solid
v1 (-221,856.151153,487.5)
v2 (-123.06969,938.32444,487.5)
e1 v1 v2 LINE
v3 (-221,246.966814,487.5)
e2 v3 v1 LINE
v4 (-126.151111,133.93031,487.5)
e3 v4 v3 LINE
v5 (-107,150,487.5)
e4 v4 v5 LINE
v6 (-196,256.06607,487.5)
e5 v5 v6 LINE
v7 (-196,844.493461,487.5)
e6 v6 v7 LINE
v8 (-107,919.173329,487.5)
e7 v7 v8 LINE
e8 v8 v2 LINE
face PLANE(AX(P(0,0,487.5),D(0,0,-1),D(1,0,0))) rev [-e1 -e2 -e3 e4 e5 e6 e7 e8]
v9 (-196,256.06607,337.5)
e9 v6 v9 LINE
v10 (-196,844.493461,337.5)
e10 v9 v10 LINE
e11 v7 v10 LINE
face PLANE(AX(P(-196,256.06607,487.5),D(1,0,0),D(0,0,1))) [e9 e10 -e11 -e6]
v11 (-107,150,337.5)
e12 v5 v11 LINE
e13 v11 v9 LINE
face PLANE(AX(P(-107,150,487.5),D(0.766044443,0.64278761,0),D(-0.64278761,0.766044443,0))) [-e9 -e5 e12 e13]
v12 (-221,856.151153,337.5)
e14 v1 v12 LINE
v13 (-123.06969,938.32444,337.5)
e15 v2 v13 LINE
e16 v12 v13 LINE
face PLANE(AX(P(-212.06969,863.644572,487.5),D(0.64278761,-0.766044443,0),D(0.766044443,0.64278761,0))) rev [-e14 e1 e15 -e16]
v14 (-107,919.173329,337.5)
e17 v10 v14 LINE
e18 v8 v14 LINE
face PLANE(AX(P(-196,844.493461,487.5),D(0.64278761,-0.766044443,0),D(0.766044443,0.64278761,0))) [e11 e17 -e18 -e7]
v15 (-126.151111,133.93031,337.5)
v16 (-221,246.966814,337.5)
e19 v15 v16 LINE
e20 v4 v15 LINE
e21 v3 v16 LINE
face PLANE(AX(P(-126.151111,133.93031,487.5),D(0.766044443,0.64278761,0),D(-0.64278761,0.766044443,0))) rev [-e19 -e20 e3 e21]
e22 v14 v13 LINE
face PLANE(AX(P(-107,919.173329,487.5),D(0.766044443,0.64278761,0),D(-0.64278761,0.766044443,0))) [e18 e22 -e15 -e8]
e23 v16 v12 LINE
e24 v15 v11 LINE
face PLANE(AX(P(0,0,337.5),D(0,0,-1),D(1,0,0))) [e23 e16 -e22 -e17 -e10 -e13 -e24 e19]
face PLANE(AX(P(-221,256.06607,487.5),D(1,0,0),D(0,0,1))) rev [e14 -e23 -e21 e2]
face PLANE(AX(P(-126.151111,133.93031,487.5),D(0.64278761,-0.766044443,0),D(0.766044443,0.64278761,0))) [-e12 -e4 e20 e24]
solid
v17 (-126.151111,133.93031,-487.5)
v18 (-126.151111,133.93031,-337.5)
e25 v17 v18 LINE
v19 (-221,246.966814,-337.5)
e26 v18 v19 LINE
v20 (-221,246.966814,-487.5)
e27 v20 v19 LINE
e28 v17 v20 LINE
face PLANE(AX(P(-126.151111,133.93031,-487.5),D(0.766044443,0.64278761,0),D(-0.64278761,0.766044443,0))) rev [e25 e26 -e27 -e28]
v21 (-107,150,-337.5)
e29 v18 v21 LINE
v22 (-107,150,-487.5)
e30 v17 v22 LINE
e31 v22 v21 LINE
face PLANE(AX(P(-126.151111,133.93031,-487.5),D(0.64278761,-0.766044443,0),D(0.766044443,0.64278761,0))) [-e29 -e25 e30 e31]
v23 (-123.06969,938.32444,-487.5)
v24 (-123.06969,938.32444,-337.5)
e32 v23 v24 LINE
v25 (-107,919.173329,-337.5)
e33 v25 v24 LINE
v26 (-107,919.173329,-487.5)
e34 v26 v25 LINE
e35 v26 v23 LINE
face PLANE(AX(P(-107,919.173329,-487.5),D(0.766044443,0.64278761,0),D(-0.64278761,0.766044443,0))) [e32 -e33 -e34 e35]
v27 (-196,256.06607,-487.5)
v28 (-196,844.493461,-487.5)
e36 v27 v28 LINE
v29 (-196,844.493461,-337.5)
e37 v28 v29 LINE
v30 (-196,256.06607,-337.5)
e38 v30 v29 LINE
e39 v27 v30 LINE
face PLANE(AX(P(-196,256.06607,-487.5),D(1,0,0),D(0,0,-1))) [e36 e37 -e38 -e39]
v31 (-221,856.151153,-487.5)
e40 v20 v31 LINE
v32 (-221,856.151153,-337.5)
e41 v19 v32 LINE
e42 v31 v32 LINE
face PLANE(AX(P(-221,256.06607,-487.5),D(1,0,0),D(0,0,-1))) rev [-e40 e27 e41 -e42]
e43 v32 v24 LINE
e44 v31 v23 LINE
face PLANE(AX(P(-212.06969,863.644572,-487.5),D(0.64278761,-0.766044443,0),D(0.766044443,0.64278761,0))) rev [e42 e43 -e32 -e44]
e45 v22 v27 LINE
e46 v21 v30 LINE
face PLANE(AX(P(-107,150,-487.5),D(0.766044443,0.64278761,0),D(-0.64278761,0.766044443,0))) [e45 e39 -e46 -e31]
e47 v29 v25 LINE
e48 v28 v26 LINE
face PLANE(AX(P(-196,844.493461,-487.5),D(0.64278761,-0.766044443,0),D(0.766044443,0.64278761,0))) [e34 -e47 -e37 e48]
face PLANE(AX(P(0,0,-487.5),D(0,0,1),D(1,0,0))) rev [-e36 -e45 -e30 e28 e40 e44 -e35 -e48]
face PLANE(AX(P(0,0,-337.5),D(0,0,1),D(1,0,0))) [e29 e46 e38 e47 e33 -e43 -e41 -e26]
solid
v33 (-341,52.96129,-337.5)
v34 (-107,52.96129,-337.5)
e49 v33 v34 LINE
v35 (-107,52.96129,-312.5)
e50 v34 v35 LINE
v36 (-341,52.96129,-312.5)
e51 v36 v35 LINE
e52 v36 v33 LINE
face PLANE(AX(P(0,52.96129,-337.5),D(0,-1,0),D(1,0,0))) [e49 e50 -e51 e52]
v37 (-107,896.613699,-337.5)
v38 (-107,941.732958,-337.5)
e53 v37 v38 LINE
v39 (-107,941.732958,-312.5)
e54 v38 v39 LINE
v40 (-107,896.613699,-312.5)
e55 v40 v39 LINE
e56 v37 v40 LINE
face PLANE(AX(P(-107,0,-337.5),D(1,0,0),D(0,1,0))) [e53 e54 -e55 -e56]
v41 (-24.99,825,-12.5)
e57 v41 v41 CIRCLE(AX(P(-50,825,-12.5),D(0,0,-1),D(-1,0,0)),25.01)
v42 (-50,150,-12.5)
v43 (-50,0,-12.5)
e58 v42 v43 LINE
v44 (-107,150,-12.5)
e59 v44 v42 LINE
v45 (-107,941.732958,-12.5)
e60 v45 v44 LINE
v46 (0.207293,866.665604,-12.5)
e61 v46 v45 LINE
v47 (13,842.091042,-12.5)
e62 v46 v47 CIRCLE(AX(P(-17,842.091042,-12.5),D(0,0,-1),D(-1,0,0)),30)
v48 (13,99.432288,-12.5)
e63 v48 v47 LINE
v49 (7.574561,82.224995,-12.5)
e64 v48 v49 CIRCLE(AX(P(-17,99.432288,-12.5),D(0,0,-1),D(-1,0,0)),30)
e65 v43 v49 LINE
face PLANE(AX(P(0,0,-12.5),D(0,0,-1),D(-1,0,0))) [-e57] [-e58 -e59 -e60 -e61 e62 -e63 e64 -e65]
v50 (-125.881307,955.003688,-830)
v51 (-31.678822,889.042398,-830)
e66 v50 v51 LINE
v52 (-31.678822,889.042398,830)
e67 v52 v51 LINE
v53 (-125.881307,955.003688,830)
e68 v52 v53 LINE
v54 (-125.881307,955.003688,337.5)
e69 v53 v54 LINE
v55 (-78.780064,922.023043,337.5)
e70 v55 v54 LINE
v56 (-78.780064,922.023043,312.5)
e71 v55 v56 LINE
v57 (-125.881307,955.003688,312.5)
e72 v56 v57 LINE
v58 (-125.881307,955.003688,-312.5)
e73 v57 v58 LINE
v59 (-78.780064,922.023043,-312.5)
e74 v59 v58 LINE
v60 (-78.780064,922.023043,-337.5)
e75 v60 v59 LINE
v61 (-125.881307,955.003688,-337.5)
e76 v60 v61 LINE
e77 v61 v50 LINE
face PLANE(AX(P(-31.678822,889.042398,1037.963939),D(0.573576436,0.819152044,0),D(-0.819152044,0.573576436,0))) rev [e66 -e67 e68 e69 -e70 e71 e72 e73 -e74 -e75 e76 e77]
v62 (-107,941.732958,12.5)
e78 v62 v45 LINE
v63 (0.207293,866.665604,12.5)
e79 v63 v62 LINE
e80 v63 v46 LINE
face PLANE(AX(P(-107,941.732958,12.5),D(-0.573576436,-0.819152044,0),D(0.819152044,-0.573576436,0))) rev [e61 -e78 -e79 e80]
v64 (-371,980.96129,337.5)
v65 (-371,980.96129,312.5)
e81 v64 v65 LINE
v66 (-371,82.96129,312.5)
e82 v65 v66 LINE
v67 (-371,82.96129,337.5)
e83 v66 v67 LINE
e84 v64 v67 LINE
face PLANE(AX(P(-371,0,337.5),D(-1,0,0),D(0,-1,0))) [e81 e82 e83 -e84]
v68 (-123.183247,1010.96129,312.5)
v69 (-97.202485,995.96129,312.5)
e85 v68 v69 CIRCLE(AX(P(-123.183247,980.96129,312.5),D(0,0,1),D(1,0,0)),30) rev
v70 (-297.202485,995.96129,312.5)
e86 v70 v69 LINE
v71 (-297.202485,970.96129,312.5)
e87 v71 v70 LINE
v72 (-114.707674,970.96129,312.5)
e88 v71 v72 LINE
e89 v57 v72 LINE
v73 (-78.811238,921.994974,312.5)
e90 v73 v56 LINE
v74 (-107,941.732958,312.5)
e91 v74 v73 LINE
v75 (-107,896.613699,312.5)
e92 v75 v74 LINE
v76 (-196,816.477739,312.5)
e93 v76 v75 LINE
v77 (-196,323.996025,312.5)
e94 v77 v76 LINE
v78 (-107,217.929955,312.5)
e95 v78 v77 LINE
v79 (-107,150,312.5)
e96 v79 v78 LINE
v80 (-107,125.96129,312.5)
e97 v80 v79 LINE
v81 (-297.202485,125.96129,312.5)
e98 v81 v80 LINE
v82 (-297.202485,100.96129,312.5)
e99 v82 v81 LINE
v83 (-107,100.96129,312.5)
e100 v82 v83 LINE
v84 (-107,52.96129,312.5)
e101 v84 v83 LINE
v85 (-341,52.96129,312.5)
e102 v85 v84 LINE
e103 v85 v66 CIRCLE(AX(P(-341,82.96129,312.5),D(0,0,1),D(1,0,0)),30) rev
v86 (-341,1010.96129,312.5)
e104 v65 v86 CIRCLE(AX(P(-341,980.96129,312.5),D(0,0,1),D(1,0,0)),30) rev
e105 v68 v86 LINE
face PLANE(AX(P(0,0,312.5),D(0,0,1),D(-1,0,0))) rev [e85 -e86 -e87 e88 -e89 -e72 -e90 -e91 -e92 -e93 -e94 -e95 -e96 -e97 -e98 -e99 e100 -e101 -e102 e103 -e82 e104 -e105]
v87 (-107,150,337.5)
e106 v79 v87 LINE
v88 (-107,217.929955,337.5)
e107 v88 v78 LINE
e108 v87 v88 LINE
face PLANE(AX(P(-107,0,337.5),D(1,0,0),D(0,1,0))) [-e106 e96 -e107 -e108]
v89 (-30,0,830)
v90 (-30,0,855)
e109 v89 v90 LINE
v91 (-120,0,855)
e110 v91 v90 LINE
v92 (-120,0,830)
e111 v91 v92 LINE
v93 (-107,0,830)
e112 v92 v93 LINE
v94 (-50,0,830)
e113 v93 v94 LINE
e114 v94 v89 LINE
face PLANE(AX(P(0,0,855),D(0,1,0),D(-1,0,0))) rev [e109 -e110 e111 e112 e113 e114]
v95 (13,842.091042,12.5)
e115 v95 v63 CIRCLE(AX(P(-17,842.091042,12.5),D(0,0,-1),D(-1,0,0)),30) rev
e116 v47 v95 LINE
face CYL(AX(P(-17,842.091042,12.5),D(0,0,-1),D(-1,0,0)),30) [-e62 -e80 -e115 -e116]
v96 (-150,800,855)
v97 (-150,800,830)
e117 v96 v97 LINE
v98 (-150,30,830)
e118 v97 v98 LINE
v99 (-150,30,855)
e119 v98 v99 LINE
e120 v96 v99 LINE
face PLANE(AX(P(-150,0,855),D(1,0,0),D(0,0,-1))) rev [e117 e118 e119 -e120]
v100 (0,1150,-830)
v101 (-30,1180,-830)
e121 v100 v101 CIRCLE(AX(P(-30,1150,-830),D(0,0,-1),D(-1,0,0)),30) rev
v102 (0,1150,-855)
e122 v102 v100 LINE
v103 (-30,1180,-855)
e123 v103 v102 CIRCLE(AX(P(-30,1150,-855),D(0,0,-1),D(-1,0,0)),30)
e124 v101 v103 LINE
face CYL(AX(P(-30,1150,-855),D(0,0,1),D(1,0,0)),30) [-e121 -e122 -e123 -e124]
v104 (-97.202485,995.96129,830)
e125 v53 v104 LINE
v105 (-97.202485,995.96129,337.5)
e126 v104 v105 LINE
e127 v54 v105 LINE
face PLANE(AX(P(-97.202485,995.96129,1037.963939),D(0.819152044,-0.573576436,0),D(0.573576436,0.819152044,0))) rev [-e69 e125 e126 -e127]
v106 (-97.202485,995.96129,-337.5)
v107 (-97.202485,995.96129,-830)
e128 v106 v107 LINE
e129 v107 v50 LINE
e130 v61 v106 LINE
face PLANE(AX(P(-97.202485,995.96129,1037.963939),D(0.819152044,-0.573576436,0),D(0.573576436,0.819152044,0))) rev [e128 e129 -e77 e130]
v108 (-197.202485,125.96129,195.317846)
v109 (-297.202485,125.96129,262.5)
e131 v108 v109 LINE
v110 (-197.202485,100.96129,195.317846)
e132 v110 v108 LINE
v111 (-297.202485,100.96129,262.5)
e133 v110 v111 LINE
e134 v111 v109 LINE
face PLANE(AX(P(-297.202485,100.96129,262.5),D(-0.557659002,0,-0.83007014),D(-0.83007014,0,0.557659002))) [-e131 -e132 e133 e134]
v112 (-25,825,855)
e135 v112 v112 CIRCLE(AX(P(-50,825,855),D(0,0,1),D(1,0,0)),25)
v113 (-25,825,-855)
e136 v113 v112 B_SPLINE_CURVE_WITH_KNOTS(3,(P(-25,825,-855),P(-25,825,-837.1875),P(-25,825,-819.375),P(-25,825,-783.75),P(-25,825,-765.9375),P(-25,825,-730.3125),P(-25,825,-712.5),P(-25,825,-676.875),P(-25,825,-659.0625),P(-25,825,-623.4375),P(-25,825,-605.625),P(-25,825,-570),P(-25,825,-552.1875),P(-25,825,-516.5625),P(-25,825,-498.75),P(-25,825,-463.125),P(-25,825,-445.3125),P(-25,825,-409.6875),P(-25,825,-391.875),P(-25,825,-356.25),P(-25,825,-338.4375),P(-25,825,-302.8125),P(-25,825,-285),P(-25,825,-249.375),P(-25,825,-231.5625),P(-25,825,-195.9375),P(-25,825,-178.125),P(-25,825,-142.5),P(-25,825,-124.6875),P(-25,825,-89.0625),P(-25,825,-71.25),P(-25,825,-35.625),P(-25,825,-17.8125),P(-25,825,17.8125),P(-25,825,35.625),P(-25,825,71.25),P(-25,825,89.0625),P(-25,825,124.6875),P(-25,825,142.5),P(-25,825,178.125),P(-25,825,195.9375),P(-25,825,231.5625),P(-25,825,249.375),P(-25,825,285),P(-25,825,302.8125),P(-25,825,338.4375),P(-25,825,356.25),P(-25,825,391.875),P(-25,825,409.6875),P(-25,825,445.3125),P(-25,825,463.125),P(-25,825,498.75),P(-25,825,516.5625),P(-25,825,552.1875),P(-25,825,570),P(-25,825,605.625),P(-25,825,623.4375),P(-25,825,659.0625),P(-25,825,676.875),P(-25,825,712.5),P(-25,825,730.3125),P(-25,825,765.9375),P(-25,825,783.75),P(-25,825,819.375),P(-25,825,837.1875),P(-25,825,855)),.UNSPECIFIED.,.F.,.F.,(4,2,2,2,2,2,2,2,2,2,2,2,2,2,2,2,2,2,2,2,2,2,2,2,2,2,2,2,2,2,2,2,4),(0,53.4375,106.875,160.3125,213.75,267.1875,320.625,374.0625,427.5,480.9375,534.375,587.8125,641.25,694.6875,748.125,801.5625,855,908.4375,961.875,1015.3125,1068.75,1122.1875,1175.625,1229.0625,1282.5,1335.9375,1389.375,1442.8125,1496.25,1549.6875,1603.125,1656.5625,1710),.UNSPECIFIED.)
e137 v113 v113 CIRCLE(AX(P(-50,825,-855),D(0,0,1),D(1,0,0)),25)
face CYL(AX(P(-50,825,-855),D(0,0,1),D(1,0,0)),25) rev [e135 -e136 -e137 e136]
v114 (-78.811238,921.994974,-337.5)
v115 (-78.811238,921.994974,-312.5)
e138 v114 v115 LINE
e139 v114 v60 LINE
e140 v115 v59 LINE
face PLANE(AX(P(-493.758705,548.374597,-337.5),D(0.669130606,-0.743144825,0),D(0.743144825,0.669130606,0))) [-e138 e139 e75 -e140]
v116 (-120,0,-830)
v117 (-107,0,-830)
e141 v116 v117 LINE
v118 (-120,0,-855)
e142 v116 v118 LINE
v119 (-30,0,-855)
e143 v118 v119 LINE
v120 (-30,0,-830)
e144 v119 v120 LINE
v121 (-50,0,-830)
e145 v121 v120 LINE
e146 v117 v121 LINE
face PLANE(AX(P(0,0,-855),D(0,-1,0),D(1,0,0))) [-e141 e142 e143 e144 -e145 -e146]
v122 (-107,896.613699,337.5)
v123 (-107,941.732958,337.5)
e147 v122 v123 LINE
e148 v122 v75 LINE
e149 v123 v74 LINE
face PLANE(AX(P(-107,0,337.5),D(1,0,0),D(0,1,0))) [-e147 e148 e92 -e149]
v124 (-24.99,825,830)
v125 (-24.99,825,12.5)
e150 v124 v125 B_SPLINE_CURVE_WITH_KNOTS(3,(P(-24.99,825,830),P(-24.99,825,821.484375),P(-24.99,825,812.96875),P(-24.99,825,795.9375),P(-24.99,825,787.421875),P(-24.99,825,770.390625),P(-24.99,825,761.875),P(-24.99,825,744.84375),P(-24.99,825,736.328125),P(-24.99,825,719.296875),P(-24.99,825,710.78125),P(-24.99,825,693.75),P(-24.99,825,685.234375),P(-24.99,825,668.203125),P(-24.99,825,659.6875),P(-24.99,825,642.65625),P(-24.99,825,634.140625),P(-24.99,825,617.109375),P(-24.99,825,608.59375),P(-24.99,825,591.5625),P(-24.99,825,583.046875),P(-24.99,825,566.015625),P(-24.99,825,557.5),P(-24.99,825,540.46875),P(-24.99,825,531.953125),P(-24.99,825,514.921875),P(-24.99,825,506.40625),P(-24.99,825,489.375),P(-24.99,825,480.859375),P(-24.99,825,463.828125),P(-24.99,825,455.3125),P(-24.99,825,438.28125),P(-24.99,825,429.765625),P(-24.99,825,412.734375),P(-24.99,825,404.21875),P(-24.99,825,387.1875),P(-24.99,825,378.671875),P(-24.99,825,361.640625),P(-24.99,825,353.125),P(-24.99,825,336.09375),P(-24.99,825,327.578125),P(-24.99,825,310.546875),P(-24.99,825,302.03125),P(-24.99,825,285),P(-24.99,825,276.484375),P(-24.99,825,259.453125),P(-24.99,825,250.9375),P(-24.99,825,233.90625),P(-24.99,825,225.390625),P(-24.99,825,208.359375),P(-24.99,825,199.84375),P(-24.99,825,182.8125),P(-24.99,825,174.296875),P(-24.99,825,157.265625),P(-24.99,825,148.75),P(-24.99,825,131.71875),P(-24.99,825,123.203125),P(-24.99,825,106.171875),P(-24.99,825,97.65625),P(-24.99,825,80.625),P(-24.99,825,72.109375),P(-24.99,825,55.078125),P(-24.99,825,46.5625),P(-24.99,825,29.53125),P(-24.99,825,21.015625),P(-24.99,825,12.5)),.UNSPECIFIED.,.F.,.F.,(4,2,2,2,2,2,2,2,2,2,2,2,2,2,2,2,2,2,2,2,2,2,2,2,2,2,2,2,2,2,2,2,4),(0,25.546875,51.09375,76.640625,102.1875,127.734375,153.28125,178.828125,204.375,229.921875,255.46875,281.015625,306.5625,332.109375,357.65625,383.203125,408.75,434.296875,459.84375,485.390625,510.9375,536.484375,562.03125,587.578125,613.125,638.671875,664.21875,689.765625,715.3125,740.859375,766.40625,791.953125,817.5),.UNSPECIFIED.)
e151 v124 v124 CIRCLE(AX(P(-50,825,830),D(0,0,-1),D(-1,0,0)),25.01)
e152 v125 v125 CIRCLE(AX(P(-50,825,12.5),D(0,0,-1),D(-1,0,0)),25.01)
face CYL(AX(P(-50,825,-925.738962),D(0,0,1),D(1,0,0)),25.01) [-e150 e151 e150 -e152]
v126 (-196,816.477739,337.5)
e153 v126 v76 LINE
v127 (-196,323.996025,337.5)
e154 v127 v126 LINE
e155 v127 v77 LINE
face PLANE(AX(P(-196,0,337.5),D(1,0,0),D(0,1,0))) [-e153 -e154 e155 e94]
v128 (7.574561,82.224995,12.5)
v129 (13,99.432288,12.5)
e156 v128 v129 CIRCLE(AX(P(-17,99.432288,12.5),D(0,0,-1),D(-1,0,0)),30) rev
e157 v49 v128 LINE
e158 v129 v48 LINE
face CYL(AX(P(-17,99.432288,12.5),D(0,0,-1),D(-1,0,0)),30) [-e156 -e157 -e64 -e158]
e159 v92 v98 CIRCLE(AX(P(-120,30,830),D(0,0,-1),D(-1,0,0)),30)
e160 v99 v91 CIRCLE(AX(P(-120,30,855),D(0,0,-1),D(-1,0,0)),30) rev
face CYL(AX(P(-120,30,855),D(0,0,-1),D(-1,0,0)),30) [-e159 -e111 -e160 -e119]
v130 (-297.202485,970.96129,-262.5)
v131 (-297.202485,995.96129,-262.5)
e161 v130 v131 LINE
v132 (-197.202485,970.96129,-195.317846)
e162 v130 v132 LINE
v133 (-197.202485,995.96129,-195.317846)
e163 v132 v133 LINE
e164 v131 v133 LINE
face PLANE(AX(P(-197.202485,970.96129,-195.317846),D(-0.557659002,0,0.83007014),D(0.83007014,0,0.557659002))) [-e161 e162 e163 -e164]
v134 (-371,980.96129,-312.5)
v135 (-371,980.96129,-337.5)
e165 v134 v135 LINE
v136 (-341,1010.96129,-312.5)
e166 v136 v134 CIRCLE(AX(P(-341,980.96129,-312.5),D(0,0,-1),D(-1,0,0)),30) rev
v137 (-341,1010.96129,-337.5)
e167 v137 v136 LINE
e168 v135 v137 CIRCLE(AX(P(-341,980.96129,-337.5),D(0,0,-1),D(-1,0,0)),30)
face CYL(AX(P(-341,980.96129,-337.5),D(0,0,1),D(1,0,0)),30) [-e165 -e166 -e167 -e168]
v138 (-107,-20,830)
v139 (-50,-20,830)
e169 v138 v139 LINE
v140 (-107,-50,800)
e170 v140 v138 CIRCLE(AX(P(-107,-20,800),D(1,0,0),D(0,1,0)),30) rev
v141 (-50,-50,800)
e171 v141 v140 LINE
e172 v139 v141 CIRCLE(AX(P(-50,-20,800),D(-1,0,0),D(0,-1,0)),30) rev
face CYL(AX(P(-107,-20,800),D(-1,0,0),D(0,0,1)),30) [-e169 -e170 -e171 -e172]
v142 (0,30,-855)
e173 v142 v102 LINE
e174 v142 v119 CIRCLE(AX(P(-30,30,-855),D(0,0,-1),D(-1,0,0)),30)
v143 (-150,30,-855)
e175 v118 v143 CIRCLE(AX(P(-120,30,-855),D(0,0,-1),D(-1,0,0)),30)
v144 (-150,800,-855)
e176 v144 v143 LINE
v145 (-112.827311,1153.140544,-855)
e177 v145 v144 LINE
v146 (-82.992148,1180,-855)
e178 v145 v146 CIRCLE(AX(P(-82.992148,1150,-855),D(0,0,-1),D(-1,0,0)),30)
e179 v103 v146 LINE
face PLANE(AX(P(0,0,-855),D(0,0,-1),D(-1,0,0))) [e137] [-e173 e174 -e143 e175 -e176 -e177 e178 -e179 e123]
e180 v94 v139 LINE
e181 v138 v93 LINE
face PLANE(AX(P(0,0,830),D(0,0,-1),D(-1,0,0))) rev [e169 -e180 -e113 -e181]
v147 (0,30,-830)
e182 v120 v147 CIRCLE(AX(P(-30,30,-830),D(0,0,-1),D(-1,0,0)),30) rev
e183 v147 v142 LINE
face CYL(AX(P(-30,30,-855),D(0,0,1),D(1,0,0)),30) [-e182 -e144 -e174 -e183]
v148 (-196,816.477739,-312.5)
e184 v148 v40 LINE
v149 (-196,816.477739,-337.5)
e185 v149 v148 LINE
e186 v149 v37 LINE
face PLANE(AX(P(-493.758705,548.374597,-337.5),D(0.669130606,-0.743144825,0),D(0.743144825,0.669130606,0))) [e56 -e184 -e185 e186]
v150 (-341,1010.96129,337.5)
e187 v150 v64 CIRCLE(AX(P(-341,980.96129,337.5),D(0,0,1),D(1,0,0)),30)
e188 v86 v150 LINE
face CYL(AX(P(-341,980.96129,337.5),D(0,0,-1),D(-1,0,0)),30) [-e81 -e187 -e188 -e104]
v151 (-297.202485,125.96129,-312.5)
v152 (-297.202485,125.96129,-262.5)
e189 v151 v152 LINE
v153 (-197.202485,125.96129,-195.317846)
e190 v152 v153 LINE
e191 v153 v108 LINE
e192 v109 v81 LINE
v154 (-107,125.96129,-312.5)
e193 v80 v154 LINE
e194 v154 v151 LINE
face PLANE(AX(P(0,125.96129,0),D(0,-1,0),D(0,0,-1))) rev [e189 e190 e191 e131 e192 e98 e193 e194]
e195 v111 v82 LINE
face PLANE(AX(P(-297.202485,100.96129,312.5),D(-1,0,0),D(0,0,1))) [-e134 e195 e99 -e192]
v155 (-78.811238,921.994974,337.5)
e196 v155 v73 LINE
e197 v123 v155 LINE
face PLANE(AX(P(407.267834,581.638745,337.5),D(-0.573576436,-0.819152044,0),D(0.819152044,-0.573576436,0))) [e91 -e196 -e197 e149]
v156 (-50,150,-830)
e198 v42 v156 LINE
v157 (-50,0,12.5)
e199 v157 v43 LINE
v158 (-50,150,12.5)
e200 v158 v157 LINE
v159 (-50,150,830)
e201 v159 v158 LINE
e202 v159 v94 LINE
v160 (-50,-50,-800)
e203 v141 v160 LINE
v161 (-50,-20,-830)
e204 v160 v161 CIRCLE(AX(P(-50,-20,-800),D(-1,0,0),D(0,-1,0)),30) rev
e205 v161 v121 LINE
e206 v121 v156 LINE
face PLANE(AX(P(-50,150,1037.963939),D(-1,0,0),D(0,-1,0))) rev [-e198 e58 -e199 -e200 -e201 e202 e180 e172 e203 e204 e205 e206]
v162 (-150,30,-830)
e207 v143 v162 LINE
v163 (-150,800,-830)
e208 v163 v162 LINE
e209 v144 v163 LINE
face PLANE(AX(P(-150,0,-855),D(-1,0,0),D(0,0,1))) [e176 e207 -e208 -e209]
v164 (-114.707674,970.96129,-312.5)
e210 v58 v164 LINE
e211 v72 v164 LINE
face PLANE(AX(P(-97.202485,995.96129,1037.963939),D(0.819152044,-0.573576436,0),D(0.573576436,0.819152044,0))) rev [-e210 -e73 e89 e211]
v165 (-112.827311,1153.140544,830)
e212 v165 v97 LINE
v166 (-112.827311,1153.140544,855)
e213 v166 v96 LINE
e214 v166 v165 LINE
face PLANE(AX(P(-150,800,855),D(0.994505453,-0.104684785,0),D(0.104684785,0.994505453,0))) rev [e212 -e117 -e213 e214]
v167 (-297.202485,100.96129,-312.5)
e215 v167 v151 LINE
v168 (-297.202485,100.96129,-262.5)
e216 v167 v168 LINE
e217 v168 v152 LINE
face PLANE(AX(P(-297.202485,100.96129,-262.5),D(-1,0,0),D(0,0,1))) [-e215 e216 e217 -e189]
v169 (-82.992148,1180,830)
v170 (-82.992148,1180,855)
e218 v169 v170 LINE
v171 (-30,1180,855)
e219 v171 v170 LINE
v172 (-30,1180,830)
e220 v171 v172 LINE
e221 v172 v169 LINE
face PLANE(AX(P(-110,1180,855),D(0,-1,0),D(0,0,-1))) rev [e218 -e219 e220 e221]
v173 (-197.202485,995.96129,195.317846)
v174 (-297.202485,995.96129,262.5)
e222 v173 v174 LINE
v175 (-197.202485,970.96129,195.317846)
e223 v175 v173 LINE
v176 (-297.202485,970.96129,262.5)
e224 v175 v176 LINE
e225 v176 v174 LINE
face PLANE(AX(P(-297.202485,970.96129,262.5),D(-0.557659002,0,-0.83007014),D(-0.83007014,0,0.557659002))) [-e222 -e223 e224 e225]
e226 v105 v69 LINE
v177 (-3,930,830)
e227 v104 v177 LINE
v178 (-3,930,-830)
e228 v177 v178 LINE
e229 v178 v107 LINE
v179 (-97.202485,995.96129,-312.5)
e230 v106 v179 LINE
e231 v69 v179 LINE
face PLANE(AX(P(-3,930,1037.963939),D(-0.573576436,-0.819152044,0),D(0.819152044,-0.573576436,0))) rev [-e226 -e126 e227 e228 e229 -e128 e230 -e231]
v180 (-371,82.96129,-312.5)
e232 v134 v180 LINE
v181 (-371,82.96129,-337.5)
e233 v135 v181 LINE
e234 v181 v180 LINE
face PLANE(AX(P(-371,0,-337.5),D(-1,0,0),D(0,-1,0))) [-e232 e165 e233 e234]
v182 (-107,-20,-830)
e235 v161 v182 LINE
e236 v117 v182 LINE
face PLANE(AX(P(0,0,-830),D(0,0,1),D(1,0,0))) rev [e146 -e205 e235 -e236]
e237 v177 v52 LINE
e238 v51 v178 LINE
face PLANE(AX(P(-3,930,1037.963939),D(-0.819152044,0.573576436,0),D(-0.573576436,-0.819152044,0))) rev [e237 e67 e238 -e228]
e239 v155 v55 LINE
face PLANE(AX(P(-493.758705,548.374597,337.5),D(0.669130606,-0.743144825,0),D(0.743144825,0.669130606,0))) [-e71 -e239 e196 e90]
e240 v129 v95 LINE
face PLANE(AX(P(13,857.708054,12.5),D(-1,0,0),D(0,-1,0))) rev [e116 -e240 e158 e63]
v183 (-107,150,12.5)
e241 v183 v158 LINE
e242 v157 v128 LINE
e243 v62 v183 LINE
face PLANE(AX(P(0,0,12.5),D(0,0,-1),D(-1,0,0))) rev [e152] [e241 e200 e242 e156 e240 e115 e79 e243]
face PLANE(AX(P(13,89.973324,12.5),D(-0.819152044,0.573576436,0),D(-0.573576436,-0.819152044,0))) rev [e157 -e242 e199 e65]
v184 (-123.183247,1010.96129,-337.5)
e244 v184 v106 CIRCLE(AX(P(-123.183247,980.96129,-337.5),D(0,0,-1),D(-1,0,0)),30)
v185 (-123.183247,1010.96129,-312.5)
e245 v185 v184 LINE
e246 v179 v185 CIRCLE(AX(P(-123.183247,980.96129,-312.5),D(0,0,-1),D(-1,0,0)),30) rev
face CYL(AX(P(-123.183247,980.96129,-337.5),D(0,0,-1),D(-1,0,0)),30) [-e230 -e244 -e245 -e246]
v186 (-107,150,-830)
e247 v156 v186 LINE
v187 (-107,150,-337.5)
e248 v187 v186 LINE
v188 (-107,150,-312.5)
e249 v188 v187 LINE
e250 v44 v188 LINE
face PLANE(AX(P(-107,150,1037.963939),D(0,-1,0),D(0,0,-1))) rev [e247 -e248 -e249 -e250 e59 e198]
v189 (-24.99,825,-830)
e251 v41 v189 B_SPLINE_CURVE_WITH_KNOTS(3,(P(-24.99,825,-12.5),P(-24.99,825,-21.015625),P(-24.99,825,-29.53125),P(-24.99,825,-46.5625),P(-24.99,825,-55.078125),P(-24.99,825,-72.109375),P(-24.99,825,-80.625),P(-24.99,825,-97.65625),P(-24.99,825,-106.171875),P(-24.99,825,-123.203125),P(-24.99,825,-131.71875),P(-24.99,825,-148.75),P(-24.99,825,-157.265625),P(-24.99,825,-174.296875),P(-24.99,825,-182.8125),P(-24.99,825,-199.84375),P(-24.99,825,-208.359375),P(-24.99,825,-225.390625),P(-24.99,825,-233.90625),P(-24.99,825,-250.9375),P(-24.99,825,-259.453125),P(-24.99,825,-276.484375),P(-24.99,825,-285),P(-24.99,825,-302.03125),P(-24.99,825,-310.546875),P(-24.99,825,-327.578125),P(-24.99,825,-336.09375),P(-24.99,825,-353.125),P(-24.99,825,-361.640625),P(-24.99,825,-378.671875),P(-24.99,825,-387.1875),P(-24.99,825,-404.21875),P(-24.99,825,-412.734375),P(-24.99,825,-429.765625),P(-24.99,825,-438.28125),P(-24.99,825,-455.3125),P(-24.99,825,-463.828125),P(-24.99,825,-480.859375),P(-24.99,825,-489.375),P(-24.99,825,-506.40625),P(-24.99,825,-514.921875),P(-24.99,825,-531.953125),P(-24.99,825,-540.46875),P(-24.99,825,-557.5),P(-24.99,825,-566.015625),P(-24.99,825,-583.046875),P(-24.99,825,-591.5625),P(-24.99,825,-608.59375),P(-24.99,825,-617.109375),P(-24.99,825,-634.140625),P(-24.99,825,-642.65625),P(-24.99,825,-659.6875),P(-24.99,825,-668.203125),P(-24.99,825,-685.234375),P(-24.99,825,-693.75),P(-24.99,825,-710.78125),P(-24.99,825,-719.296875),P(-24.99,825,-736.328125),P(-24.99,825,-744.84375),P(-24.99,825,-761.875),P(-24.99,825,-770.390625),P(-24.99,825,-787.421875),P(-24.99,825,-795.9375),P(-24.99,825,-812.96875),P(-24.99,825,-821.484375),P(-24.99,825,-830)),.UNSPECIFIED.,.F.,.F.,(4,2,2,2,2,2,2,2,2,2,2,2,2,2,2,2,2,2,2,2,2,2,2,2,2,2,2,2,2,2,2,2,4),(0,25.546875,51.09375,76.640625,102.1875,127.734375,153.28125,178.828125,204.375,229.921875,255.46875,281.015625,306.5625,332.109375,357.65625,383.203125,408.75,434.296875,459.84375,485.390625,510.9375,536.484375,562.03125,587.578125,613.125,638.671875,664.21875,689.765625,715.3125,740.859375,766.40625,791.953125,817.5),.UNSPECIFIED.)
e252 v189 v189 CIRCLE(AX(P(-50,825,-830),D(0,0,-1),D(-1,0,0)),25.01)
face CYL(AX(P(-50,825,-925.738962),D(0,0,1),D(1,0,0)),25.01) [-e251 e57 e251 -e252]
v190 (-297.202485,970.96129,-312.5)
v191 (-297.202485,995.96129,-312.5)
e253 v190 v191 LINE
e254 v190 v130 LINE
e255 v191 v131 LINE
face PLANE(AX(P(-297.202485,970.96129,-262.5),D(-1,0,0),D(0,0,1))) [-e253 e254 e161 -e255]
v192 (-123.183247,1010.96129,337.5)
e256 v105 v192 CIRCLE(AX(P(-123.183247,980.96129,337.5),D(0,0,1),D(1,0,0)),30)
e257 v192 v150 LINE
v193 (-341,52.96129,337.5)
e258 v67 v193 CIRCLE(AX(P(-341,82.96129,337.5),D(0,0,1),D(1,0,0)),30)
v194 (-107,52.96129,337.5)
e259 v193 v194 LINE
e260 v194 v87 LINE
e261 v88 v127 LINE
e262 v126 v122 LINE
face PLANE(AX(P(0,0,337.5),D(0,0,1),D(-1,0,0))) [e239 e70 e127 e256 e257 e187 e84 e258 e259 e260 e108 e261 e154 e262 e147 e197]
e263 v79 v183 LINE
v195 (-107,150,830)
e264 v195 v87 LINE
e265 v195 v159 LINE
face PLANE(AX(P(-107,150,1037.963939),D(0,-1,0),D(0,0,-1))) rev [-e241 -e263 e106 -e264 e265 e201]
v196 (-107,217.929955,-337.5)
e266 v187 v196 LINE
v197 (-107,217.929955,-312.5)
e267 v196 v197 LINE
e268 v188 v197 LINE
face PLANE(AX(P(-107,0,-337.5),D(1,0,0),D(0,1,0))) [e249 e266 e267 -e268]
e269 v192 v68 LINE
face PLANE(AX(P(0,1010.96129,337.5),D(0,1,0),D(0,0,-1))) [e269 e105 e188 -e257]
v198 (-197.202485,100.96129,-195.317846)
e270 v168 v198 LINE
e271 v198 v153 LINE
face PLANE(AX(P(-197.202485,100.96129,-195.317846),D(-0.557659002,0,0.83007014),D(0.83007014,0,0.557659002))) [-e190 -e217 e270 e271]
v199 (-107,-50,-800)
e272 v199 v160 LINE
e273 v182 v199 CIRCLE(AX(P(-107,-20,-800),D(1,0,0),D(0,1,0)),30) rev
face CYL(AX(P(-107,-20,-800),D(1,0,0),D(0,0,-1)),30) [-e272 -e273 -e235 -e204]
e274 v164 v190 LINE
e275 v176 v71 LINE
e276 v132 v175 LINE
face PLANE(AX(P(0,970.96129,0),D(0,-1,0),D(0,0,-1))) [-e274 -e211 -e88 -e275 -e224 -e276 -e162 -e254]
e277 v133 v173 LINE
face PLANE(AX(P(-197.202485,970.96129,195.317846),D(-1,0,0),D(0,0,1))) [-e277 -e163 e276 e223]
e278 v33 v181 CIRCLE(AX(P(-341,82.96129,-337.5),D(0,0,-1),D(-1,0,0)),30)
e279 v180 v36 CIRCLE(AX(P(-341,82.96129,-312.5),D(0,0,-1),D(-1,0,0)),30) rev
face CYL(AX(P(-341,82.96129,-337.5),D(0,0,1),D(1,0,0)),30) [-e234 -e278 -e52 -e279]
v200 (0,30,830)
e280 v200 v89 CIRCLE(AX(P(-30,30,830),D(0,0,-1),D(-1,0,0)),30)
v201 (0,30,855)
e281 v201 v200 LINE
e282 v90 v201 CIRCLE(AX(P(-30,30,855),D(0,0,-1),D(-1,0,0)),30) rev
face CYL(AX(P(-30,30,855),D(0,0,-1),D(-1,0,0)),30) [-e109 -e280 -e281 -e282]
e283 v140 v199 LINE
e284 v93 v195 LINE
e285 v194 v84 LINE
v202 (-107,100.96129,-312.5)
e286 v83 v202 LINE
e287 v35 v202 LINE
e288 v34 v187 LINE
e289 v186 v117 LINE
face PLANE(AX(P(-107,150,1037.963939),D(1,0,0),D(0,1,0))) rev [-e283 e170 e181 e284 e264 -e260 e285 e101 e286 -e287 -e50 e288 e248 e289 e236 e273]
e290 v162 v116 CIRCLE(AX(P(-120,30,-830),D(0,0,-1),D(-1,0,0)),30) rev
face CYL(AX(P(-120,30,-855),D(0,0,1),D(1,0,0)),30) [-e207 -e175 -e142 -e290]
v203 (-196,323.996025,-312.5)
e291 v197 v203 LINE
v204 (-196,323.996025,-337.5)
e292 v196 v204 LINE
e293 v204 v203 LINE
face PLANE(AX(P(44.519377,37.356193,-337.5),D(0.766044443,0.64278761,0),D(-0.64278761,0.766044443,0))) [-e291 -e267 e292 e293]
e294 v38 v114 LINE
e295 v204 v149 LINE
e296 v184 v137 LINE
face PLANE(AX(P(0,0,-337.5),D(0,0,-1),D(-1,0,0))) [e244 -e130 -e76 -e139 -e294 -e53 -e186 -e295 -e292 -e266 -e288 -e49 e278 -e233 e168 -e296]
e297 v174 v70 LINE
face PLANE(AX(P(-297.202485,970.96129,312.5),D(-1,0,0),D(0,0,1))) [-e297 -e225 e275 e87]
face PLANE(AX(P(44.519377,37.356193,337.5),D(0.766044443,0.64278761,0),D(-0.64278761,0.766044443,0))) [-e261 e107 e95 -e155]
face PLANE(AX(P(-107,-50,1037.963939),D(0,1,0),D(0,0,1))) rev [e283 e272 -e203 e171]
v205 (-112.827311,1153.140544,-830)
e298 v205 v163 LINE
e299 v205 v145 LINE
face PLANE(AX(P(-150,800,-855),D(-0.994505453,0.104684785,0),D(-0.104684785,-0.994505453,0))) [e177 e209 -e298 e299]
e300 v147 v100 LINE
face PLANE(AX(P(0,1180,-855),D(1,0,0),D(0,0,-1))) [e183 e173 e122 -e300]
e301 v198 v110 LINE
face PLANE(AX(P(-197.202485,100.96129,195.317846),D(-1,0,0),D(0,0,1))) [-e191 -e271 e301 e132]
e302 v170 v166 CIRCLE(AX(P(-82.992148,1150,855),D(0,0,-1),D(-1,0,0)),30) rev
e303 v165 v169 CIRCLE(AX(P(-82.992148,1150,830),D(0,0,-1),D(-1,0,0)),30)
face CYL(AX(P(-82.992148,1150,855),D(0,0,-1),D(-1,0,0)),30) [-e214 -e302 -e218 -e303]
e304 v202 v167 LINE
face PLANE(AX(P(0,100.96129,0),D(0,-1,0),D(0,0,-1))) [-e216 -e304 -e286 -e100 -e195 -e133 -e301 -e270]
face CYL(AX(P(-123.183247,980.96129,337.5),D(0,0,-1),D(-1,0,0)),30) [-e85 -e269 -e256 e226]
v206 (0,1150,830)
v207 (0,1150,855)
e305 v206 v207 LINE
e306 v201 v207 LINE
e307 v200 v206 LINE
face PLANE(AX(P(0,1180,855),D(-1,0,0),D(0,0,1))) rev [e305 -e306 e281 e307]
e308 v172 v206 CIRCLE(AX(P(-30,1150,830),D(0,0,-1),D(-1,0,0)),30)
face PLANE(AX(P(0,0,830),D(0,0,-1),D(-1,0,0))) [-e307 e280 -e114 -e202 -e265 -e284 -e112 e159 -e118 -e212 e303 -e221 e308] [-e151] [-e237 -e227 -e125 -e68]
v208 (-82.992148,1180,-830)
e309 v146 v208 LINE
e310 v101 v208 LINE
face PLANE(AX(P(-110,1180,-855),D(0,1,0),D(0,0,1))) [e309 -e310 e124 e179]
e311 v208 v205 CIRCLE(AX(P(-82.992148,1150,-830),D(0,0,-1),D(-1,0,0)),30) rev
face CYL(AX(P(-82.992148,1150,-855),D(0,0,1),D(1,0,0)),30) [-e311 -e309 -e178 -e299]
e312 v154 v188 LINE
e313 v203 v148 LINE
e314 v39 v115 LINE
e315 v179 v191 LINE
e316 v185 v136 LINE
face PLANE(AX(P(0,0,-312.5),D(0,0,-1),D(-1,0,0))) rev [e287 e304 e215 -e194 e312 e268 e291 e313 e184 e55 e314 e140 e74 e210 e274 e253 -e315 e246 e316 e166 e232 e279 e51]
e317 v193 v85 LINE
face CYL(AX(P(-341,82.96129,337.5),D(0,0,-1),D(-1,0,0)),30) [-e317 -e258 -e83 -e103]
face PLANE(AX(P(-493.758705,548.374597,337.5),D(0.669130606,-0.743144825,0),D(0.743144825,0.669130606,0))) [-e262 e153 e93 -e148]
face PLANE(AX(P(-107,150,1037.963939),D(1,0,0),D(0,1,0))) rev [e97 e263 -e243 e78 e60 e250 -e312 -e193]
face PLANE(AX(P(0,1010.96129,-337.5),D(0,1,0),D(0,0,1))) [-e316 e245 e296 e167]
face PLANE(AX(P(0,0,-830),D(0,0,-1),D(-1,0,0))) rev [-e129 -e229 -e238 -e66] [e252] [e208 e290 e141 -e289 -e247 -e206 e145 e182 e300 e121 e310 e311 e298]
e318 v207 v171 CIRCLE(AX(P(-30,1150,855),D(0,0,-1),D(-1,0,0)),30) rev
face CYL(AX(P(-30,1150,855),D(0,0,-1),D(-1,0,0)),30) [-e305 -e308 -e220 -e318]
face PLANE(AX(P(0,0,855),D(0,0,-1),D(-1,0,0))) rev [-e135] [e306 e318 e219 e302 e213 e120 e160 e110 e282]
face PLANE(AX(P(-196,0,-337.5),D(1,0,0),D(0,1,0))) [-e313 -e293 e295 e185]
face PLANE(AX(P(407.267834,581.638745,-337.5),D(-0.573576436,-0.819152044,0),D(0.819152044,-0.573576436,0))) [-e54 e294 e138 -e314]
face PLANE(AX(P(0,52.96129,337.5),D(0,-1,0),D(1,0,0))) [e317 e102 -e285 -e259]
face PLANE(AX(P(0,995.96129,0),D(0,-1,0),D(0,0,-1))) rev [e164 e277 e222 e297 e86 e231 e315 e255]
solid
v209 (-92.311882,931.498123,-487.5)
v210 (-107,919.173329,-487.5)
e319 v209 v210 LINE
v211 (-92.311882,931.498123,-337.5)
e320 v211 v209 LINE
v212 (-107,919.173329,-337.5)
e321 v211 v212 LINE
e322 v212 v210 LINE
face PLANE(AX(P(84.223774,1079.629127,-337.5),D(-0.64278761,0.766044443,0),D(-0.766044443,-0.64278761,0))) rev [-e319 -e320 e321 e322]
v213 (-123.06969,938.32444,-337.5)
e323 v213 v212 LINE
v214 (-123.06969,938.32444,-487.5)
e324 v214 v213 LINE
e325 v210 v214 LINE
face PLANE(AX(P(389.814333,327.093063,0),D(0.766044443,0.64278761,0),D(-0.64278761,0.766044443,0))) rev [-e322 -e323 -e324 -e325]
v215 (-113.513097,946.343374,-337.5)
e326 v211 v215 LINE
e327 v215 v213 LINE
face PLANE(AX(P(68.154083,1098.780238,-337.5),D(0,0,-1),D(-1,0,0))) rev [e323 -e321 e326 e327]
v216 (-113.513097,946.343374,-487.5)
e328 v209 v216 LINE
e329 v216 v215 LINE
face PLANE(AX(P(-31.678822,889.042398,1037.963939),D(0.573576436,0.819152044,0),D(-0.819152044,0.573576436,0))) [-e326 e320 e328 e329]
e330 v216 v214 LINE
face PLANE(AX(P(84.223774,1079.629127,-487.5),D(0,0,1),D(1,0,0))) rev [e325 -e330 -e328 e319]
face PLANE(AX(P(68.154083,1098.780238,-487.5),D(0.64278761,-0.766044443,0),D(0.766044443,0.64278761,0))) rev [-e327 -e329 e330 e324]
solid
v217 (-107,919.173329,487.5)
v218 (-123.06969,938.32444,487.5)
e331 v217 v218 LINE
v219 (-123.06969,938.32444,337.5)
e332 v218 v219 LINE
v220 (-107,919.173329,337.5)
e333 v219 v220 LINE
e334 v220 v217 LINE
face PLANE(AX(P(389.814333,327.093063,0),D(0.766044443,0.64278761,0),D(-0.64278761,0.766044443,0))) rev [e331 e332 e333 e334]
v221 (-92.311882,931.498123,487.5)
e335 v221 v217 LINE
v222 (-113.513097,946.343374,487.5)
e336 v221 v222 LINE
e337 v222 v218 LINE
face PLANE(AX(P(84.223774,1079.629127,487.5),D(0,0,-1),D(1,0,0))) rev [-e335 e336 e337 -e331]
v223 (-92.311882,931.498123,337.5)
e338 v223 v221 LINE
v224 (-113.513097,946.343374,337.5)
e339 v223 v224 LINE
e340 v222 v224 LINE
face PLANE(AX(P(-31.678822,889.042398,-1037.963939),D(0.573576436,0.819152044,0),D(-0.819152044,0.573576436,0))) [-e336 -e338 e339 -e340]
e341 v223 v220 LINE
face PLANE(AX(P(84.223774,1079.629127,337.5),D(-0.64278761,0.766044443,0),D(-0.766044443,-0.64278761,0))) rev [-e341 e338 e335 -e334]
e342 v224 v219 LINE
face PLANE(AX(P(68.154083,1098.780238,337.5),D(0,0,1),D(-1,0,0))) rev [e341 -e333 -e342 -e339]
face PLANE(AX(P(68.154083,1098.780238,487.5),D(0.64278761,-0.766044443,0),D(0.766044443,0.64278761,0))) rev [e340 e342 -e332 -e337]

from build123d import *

# Parameters (mm, degrees)
BOSS_EXTRUDE1_START = 830
BOSS_EXTRUDE1_DEPTH = 25
BOSS_EXTRUDE2_START = -830
BOSS_EXTRUDE2_DEPTH = 25
SKETCH2_W           = 57
SKETCH2_H           = 200
BOSS_EXTRUDE3_DEPTH = 1660
BOSS_EXTRUDE4_DEPTH = 12.5
SKETCH4_R           = 25
CUT_EXTRUDE1_DEPTH  = 2084.026644093
BOSS_EXTRUDE5_START = -1685
SKETCH5_R           = 25.01
SKETCH5_R_2         = 25
BOSS_EXTRUDE5_DEPTH = 1660
BOSS_EXTRUDE6_START = 300
BOSS_EXTRUDE6_DEPTH = 25
EXTRUDE_THIN1_DEPTH = 150
BOSS_EXTRUDE7_REACH = 1429.345
SKETCH9_W           = 150
SKETCH9_H           = 25
BOSS_EXTRUDE8_DEPTH = 25
LPATTERN1_COUNT     = 2
LPATTERN1_PITCH     = 870
FILLET1_R           = 30


with BuildPart() as part:
    # Sketch1 → Boss-Extrude1 (new body)
    with BuildSketch(Plane.XY.offset(BOSS_EXTRUDE1_START)):
        Polygon((0, 1180), (0, 0), (-150, 0), (-150, 800), (-110, 1180), align=None)
    extrude(amount=BOSS_EXTRUDE1_DEPTH)



with BuildPart() as body_2:
    # Sketch1<2> → Boss-Extrude2 (new body)
    with BuildSketch(Plane.XY.offset(BOSS_EXTRUDE2_START)):
        Polygon((0, 1180), (0, 0), (-150, 0), (-150, 800), (-110, 1180), align=None)
    extrude(amount=-BOSS_EXTRUDE2_DEPTH)


with BuildPart() as part_1:
    add(part.part)

    add(body_2.part)  # Boss-Extrude3 merges body 2
    # Sketch2 → Boss-Extrude3 (add)
    with BuildSketch(Plane.XY.offset(-830)):
        Polygon((-3, 930), (-97.202485093, 995.96129018), (-125.881306911, 955.003687966), (-31.678821818, 889.042397786), align=None)
        with Locations((-78.5, 50)):
            Rectangle(SKETCH2_W, SKETCH2_H)
    extrude(amount=BOSS_EXTRUDE3_DEPTH)

    # Sketch3 → Boss-Extrude4 (add, symmetric)
    with BuildSketch(Plane.XY):
        Polygon((-107, 941.732958314), (-13.742380871, 876.433270404), (13, 857.708053729), (13, 89.973324425), (-50, 0), (-50, 150), (-107, 150), align=None)
    extrude(amount=BOSS_EXTRUDE4_DEPTH, both=True)

    # Sketch4 → Cut-Extrude1 (cut, through all)
    with BuildSketch(Plane.XY.offset(855)):
        with Locations((-50, 825)):
            Circle(SKETCH4_R)
    extrude(amount=-CUT_EXTRUDE1_DEPTH, mode=Mode.SUBTRACT)

    # Sketch5 → Boss-Extrude5 (add)
    with BuildSketch(Plane.XY.offset(855).offset(BOSS_EXTRUDE5_START)):
        with Locations((-50, 825)):
            Circle(SKETCH5_R)
        with Locations((-50, 825)):
            Circle(SKETCH5_R_2, mode=Mode.SUBTRACT)
    extrude(amount=BOSS_EXTRUDE5_DEPTH)

    # Sketch7 → Boss-Extrude6 (add)
    with BuildSketch(Plane(origin=(0, 0, -12.5), x_dir=(-1, 0, 0), z_dir=(0, 0, -1)).offset(BOSS_EXTRUDE6_START)):
        Polygon((97.202485093, 995.96129018), (125.881306911, 955.003687966), (78.780064364, 922.023042876), (78.811237587, 921.99497438), (107, 941.732958314), (107, 896.613698699), (196, 816.477738757), (196, 323.996024519), (107, 217.929954778), (107, 150), (107, 52.96129018), (371, 52.96129018), (371, 1010.96129018), (97.202485093, 1010.96129018), align=None)
    extrude(amount=BOSS_EXTRUDE6_DEPTH)


with BuildPart() as body_2_2:
    # Sketch8 → Extrude-Thin1 (new body)
    with BuildSketch(Plane(origin=(0, 0, -337.5), x_dir=(-1, 0, 0), z_dir=(0, 0, -1))):
        Polygon((107, 150), (196, 256.066069741), (196, 844.493461332), (107, 919.173328507), (123.069690242, 938.324439585), (221, 856.151152786), (221, 246.966813884), (126.151111078, 133.930309758), align=None)
    extrude(amount=EXTRUDE_THIN1_DEPTH)


with BuildPart() as body_3:
    # Boss-Extrude7: up to this plane
    boss_extrude7_end = Plane(origin=(-31.678821818, 889.042397786, 1037.963939182), z_dir=(0.5735764363510437, 0.8191520442889936, 0))
    # Sketch9 → Boss-Extrude7 (new, up to the surface)
    with BuildSketch(Plane(origin=(389.814332632, 327.09306274, 0), x_dir=(0, 0, -1), z_dir=(0.7660444431189808, 0.6427876096865363, 0)), mode=Mode.PRIVATE) as boss_extrude7_sk1:
        with Locations((412.5, 785.405894802)):
            Rectangle(SKETCH9_W, SKETCH9_H)
    boss_extrude7_tool1 = split(extrude(boss_extrude7_sk1.sketch, amount=BOSS_EXTRUDE7_REACH, mode=Mode.PRIVATE), bisect_by=boss_extrude7_end, keep=Keep.BOTH, mode=Mode.PRIVATE)
    add(boss_extrude7_tool1.solids().sort_by_distance((-115.034845, 928.748884, -412.5))[0])


with BuildPart() as body_4:
    # Mirror4: mirrored copy
    add(body_2_2.part.mirror(Plane.XY))


with BuildPart() as body_5:
    # Mirror4 2: mirrored copy
    add(body_3.part.mirror(Plane.XY))


with BuildPart() as body_6:
    # Mirror4 3: mirrored copy
    add(part_1.part.mirror(Plane.XY))


with BuildPart() as part_2:
    add(part_1.part)

    add(body_6.part)  # Boss-Extrude8 merges body 6
    # Sketch11 → Boss-Extrude8 (add)
    with BuildSketch(Plane(origin=(0, 995.96129018, 0), x_dir=(1, 0, 0), z_dir=(0, 1, 0))):
        Polygon((-297.202485093, 312.5), (-97.202485093, 312.5), (-97.202485093, -312.5), (-297.202485093, -312.5), (-297.202485093, -262.5), (-197.202485093, -195.317845765), (-197.202485093, 195.317845765), (-297.202485093, 262.5), align=None)
    boss_extrude8 = extrude(amount=-BOSS_EXTRUDE8_DEPTH)

    # LPattern1: Boss-Extrude8 ×2
    with Locations(*[(0, -i * LPATTERN1_PITCH, 0) for i in range(1, LPATTERN1_COUNT)]):
        add(boss_extrude8)

    # Fillet1
    # the kernel refuses this fillet: 30 mm, written as the material it takes off along each edge
    with BuildSketch(Plane(origin=(0, 1180, 755), x_dir=(-1, 0, 0), z_dir=(0, 0, 1)), Plane(origin=(0, 0, 755), x_dir=(0, 1, 0), z_dir=(0, 0, 1)), Plane(origin=(0, 1180, -755), x_dir=(0, -1, 0), z_dir=(0, 0, -1)), Plane(origin=(-371, 1010.96129018, -237.5), x_dir=(1, 0, 0), z_dir=(0, 0, -1)), Plane(origin=(-371, 1010.96129018, 237.5), x_dir=(0, -1, 0), z_dir=(0, 0, 1)), Plane(origin=(-371, 52.96129018, 237.5), x_dir=(1, 0, 0), z_dir=(0, 0, 1))) as fillet1_piece_1:
        with BuildLine():
            CenterArc((FILLET1_R, FILLET1_R), FILLET1_R, 180, 90)
            Line((0, FILLET1_R), (-FILLET1_R * 0.02, FILLET1_R))
            Line((-FILLET1_R * 0.02, FILLET1_R), (-FILLET1_R * 0.02, -FILLET1_R * 0.02))
            Line((-FILLET1_R * 0.02, -FILLET1_R * 0.02), (FILLET1_R, -FILLET1_R * 0.02))
            Line((FILLET1_R, -FILLET1_R * 0.02), (FILLET1_R, 0))
        make_face()
    extrude(amount=175, mode=Mode.SUBTRACT)
    with BuildSketch(Plane(origin=(-110, 1180, 762.480369048), x_dir=(1, 0, 0), z_dir=(0, 0, 1))) as fillet1_piece_2:
        with BuildLine():
            CenterArc((FILLET1_R * 0.900261746029, -FILLET1_R), FILLET1_R, 90, 83.990994043)
            Line((-FILLET1_R * 0.0942437068928, -FILLET1_R * 0.895315215482), (-FILLET1_R * 0.114133815951, -FILLET1_R * 0.893221519792))
            Line((-FILLET1_R * 0.114133815951, -FILLET1_R * 0.893221519792), (-FILLET1_R * 0.0180052349206, FILLET1_R * 0.02))
            Line((-FILLET1_R * 0.0180052349206, FILLET1_R * 0.02), (FILLET1_R * 0.900261746029, FILLET1_R * 0.02))
            Line((FILLET1_R * 0.900261746029, FILLET1_R * 0.02), (FILLET1_R * 0.900261746029, 0))
        make_face()
    extrude(amount=160.039261904, mode=Mode.SUBTRACT)
    with BuildSketch(Plane(origin=(-150, 0, 755), x_dir=(0, 1, 0), z_dir=(0, 0, 1)), Plane(origin=(0, 0, -755), x_dir=(0, 1, 0), z_dir=(0, 0, -1)), Plane(origin=(-150, 0, -755), x_dir=(1, 0, 0), z_dir=(0, 0, -1)), Plane(origin=(-371, 52.96129018, -237.5), x_dir=(1, 0, 0), z_dir=(0, 0, -1))) as fillet1_piece_3:
        with BuildLine():
            CenterArc((FILLET1_R, -FILLET1_R), FILLET1_R, 90, 90)
            Line((0, -FILLET1_R), (-FILLET1_R * 0.02, -FILLET1_R))
            Line((-FILLET1_R * 0.02, -FILLET1_R), (-FILLET1_R * 0.02, FILLET1_R * 0.02))
            Line((-FILLET1_R * 0.02, FILLET1_R * 0.02), (FILLET1_R, FILLET1_R * 0.02))
            Line((FILLET1_R, FILLET1_R * 0.02), (FILLET1_R, 0))
        make_face()
    extrude(amount=175, mode=Mode.SUBTRACT)
    with BuildSketch(Plane(origin=(25, -50, 830), x_dir=(0, 0, -1), z_dir=(-1, 0, 0)), Plane(origin=(25, -50, -830), x_dir=(0, 1, 0), z_dir=(-1, 0, 0))) as fillet1_piece_4:
        with BuildLine():
            CenterArc((FILLET1_R, -FILLET1_R), FILLET1_R, 90, 90)
            Line((0, -FILLET1_R), (-FILLET1_R * 0.02, -FILLET1_R))
            Line((-FILLET1_R * 0.02, -FILLET1_R), (-FILLET1_R * 0.02, FILLET1_R * 0.02))
            Line((-FILLET1_R * 0.02, FILLET1_R * 0.02), (FILLET1_R, FILLET1_R * 0.02))
            Line((FILLET1_R, FILLET1_R * 0.02), (FILLET1_R, 0))
        make_face()
    extrude(amount=207, mode=Mode.SUBTRACT)
    with BuildSketch(Plane(origin=(13, 857.708053729, -51.542528791), x_dir=(-0.8191520442889964, 0.5735764363510396, 0), z_dir=(0, 0, 1))) as fillet1_piece_5:
        with BuildLine():
            CenterArc((FILLET1_R * 0.520567050552, FILLET1_R), FILLET1_R, 215, 55)
            Line((-FILLET1_R * 0.298584993737, FILLET1_R * 0.426423563649), (-FILLET1_R * 0.314968034623, FILLET1_R * 0.414952034922))
            Line((-FILLET1_R * 0.314968034623, FILLET1_R * 0.414952034922), (-FILLET1_R * 0.010411341011, -FILLET1_R * 0.02))
            Line((-FILLET1_R * 0.010411341011, -FILLET1_R * 0.02), (FILLET1_R * 0.520567050552, -FILLET1_R * 0.02))
            Line((FILLET1_R * 0.520567050552, -FILLET1_R * 0.02), (FILLET1_R * 0.520567050552, 0))
        make_face()
    extrude(amount=103.085057583, mode=Mode.SUBTRACT)
    with BuildSketch(Plane(origin=(13, 89.973324425, -36.147409166), x_dir=(-0.5735764363510505, -0.8191520442889888, 0), z_dir=(0, 0, 1))) as fillet1_piece_6:
        with BuildLine():
            CenterArc((FILLET1_R * 0.315298788879, -FILLET1_R), FILLET1_R, 90, 35)
            Line((-FILLET1_R * 0.258277647472, -FILLET1_R * 0.180847955711), (-FILLET1_R * 0.269749176199, -FILLET1_R * 0.164464914825))
            Line((-FILLET1_R * 0.269749176199, -FILLET1_R * 0.164464914825), (-FILLET1_R * 0.00630597577758, FILLET1_R * 0.02))
            Line((-FILLET1_R * 0.00630597577758, FILLET1_R * 0.02), (FILLET1_R * 0.315298788879, FILLET1_R * 0.02))
            Line((FILLET1_R * 0.315298788879, FILLET1_R * 0.02), (FILLET1_R * 0.315298788879, 0))
        make_face()
    extrude(amount=72.294818332, mode=Mode.SUBTRACT)
    with BuildSketch(Plane(origin=(-110, 1180, -762.480369048), x_dir=(1, 0, 0), z_dir=(0, 0, -1))) as fillet1_piece_7:
        with BuildLine():
            CenterArc((FILLET1_R * 0.900261746029, FILLET1_R), FILLET1_R, 186.009005957, 83.990994043)
            Line((-FILLET1_R * 0.0942437068928, FILLET1_R * 0.895315215482), (-FILLET1_R * 0.114133815951, FILLET1_R * 0.893221519792))
            Line((-FILLET1_R * 0.114133815951, FILLET1_R * 0.893221519792), (-FILLET1_R * 0.0180052349206, -FILLET1_R * 0.02))
            Line((-FILLET1_R * 0.0180052349206, -FILLET1_R * 0.02), (FILLET1_R * 0.900261746029, -FILLET1_R * 0.02))
            Line((FILLET1_R * 0.900261746029, -FILLET1_R * 0.02), (FILLET1_R * 0.900261746029, 0))
        make_face()
    extrude(amount=160.039261904, mode=Mode.SUBTRACT)
    with BuildSketch(Plane(origin=(-97.202485093, 1010.96129018, -247.548094716), x_dir=(0, -1, 0), z_dir=(0, 0, -1))) as fillet1_piece_8:
        with BuildLine():
            CenterArc((30, 25.980762114), FILLET1_R, 180, 60)
            Line((0, 25.980762114), (-0.6, 25.980762114))
            Line((-0.6, 25.980762114), (-0.6, 0))
            Line((-0.6, 0), (0, -0.6))
            ThreePointArc((0, -0.6), (7.5, -0.6), (14.7, -0.519615242))
            Line((14.7, -0.519615242), (15, 0))
        make_face()
    extrude(amount=154.903810568, mode=Mode.SUBTRACT)
    with BuildSketch(Plane(origin=(-97.202485093, 1010.96129018, 247.548094716), x_dir=(0, -1, 0), z_dir=(0, 0, 1))) as fillet1_piece_9:
        with BuildLine():
            CenterArc((30, -25.980762114), FILLET1_R, 120, 60)
            Line((0, -25.980762114), (-0.6, -25.980762114))
            Line((-0.6, -25.980762114), (-0.6, 0))
            Line((-0.6, 0), (0, 0.6))
            ThreePointArc((0, 0.6), (7.5, 0.6), (14.7, 0.519615242))
            Line((14.7, 0.519615242), (15, 0))
        make_face()
    extrude(amount=154.903810568, mode=Mode.SUBTRACT)


solid = Compound([body_2_2.part, body_3.part, body_4.part, body_5.part, part_2.part])
